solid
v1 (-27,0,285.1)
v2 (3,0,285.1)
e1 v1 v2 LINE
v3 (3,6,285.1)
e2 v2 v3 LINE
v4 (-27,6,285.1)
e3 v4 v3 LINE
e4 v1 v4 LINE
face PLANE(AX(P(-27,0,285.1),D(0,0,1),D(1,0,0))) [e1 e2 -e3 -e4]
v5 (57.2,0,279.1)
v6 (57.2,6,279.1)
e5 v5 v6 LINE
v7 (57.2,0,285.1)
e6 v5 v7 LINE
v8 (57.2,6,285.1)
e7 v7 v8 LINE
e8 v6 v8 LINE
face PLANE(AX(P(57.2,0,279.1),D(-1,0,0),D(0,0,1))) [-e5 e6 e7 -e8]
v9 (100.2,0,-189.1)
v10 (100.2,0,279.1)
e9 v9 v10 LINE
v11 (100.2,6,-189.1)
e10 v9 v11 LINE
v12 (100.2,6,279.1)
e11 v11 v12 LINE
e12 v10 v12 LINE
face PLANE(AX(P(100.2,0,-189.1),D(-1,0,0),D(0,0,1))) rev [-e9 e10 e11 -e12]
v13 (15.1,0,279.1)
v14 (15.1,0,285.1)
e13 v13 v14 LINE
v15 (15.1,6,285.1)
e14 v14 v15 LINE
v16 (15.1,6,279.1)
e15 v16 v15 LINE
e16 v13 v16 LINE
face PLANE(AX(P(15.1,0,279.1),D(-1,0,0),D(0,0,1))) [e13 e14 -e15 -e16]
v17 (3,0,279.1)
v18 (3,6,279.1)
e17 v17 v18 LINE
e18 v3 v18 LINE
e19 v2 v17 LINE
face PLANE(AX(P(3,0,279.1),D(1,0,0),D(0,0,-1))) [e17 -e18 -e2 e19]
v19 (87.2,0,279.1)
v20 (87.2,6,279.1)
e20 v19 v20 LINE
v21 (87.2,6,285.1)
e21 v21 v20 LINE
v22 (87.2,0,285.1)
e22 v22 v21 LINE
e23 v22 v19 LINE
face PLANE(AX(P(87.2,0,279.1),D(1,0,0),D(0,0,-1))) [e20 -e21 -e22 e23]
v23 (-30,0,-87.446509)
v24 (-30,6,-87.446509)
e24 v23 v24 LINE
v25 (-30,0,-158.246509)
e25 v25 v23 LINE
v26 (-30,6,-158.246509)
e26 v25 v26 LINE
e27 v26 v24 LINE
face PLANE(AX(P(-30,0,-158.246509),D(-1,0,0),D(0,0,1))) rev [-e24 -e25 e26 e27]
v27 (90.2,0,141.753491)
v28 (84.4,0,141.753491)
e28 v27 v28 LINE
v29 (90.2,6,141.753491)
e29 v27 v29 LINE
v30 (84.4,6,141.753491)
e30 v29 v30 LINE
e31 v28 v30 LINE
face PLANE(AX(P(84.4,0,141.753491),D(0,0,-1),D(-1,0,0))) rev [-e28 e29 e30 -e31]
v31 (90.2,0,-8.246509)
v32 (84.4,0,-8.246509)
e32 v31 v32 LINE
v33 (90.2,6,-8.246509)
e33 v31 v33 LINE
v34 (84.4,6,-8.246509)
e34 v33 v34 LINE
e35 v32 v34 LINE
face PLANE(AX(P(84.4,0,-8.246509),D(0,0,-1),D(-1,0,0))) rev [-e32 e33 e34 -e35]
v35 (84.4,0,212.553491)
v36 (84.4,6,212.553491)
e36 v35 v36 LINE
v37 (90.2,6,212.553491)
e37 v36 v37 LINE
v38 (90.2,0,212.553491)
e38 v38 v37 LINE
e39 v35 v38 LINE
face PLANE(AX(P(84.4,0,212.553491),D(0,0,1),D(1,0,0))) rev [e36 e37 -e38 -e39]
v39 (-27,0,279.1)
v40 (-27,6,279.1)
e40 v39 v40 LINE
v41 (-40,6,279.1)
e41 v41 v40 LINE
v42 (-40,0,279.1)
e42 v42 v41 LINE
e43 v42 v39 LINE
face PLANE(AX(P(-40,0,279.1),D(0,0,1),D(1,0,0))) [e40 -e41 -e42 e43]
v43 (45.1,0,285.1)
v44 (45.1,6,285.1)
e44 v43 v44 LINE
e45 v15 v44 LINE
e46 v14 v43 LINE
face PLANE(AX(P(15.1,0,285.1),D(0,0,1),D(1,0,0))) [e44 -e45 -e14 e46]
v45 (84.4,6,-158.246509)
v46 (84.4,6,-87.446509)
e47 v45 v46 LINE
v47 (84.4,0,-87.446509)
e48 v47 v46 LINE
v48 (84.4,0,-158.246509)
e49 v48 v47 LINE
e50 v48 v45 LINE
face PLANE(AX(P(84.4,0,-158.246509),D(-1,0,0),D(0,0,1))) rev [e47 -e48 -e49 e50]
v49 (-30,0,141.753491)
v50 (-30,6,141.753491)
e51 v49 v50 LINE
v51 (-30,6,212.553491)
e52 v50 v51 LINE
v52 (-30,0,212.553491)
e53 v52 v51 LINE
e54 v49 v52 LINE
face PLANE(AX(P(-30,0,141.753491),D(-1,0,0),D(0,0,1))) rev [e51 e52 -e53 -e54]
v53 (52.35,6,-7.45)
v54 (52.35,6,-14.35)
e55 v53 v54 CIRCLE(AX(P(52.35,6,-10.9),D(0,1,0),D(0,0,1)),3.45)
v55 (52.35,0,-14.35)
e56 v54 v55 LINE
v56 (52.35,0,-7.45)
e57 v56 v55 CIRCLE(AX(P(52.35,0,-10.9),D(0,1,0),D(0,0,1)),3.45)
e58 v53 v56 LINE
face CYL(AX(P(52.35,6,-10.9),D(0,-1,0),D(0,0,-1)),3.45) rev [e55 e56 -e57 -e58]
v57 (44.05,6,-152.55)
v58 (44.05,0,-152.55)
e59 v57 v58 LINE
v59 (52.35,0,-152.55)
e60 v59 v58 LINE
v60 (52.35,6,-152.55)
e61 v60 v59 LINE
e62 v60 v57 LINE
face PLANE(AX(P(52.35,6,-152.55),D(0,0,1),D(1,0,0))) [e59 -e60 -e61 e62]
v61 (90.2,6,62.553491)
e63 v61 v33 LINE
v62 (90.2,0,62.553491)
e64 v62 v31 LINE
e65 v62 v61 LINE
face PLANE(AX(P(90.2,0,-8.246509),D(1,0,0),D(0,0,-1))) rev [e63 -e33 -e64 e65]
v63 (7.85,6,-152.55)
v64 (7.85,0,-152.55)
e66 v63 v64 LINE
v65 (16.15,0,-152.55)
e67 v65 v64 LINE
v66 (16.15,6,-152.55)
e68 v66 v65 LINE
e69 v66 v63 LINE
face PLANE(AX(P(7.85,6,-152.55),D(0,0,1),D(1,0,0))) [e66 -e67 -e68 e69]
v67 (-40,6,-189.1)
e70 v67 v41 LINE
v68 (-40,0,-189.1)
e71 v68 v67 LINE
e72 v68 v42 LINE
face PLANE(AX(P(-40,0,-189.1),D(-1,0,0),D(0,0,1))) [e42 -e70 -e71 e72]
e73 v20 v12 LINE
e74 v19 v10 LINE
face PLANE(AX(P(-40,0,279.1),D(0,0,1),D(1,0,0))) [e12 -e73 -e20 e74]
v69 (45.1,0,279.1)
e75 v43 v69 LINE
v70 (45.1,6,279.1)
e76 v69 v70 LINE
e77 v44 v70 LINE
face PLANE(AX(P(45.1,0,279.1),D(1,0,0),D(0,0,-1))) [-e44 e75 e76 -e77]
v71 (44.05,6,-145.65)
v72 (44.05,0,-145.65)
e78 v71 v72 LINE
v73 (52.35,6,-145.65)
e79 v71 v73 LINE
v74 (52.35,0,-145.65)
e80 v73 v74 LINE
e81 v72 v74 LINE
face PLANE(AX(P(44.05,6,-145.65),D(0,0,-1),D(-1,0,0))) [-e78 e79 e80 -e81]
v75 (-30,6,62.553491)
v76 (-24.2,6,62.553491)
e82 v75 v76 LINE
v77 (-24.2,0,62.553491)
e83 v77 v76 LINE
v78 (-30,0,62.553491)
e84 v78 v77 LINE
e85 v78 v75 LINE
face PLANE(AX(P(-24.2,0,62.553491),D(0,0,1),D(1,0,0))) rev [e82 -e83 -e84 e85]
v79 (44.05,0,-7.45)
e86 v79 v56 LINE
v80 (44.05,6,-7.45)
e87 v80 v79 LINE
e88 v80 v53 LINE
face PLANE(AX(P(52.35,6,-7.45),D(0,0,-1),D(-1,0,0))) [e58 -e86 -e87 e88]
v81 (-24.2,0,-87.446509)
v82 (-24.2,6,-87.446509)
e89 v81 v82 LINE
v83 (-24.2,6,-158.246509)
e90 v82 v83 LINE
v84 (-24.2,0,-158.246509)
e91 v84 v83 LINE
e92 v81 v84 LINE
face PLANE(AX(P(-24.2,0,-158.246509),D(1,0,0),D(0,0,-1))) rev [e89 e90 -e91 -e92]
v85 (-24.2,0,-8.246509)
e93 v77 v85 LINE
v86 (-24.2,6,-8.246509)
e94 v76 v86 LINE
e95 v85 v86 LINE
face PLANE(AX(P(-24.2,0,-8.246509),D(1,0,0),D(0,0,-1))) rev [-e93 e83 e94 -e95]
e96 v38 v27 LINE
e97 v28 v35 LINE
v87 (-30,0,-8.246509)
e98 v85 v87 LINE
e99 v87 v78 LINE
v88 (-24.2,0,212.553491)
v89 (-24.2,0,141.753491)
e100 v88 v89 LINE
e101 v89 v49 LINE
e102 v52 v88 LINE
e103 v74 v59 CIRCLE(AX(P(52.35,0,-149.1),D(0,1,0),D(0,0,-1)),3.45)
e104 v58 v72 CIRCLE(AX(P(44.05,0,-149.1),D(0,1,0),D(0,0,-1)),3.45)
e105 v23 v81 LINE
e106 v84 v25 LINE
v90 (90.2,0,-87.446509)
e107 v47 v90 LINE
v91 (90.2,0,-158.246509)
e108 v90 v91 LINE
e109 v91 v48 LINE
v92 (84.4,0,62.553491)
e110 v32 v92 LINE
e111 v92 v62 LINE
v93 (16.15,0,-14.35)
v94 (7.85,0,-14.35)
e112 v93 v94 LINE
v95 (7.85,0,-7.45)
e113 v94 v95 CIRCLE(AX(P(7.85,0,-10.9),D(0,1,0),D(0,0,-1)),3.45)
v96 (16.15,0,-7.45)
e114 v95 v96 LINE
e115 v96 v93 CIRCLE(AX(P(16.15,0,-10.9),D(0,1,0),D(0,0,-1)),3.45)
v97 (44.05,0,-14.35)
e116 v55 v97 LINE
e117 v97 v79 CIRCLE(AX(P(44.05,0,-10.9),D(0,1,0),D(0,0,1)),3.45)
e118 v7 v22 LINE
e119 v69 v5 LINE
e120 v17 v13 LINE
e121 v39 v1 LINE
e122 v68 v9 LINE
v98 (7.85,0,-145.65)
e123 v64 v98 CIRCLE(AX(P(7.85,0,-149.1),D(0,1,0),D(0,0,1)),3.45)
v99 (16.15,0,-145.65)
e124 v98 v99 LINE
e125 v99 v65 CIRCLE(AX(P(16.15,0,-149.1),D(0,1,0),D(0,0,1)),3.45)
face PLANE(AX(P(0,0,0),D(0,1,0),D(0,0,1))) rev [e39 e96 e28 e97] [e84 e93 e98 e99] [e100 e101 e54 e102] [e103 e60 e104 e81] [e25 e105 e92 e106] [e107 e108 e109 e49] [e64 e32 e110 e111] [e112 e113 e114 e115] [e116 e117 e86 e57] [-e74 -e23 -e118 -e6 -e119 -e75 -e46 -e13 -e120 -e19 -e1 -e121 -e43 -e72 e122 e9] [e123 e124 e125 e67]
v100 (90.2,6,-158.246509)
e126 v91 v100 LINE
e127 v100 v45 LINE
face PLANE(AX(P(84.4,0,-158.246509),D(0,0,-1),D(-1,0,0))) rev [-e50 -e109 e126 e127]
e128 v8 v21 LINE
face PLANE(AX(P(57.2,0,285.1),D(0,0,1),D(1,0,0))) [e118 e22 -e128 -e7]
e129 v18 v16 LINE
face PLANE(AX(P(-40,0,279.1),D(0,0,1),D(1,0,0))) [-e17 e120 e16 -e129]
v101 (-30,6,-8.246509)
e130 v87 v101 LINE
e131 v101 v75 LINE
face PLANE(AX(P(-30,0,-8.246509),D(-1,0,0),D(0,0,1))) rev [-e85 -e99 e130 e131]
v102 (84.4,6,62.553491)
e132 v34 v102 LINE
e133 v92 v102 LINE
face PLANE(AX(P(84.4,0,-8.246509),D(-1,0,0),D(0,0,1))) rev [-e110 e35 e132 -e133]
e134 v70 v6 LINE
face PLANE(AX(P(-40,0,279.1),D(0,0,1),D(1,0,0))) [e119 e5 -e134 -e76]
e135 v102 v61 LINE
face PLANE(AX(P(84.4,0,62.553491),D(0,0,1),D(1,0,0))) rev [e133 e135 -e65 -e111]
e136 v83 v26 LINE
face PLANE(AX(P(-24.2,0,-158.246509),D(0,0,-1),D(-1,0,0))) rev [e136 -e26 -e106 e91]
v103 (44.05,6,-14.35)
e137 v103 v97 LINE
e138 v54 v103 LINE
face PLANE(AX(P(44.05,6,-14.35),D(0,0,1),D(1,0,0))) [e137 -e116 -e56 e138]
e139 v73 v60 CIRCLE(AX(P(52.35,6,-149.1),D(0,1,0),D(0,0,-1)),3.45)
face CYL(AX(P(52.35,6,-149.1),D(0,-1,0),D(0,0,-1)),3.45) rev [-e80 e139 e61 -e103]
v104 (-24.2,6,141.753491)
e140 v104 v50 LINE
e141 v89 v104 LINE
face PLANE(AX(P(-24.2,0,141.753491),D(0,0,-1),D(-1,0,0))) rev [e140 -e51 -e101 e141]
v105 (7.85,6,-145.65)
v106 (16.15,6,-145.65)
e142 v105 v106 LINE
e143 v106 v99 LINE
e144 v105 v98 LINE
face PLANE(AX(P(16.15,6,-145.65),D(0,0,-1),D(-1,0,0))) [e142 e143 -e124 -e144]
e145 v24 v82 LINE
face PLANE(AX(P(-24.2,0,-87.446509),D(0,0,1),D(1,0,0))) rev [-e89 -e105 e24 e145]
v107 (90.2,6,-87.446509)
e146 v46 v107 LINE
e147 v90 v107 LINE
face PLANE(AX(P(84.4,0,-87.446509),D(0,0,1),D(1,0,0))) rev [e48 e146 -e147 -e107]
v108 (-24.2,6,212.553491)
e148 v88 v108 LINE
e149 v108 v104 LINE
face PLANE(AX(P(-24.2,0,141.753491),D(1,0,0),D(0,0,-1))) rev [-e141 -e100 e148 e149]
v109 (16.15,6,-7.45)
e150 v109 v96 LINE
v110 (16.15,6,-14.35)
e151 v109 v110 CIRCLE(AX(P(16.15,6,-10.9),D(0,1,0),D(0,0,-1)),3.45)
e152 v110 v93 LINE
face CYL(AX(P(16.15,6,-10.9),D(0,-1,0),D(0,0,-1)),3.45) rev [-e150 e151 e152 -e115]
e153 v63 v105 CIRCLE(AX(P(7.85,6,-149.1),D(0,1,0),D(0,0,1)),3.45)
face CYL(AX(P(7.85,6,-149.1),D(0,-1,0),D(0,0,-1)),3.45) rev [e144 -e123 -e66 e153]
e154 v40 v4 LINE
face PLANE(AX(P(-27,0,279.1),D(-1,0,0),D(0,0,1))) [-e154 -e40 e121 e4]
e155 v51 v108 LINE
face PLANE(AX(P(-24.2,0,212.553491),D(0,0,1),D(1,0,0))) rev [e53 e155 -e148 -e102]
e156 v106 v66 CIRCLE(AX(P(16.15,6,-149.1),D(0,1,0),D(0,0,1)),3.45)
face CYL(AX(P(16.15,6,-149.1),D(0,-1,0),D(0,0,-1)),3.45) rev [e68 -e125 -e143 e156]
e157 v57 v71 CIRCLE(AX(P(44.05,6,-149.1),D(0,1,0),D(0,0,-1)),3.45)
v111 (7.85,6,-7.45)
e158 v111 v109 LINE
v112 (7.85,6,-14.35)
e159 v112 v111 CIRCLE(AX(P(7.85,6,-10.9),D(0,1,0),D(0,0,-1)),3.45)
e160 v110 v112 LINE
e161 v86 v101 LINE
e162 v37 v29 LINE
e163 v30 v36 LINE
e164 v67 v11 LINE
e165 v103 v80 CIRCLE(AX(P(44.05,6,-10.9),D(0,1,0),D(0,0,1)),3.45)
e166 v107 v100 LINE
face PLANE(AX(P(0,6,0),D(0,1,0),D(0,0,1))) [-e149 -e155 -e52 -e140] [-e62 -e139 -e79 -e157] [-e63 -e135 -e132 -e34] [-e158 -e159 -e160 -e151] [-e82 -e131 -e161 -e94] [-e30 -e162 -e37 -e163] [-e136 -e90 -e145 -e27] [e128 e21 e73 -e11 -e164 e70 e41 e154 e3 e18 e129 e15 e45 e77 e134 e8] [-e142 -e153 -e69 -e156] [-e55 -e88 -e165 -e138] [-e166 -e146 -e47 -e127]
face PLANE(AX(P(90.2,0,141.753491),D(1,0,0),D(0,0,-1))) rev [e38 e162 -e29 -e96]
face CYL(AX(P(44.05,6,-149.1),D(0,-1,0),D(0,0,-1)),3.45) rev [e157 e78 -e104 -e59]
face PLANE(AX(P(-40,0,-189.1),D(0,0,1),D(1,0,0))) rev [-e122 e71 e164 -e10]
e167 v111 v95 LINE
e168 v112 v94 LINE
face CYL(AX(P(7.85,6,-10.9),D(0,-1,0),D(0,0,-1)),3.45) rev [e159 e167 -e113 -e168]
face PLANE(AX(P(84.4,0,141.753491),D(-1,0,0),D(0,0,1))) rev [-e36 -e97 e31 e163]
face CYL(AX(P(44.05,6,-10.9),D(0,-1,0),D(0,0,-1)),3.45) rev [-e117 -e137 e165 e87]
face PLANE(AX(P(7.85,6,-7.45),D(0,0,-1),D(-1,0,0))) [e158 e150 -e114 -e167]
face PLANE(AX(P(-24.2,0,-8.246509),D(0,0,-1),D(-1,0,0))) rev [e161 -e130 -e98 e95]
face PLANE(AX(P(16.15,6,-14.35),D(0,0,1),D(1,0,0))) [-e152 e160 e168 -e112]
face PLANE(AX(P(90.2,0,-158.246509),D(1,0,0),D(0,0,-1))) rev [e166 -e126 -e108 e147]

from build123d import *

# Parameters (mm, degrees)
SKETCH1_W           = 60.2
SKETCH1_H           = 160
BOSS_EXTRUDE1_DEPTH = 6
BOSS_EXTRUDE2_START = -6
SKETCH2_W           = 140.2
SKETCH2_H           = 468.2
BOSS_EXTRUDE2_DEPTH = 6
SKETCH3_W           = 5.8
SKETCH3_H           = 70.8
CUT_EXTRUDE1_DEPTH  = 6
SKETCH4_W           = 30
SKETCH4_H           = 6
BOSS_EXTRUDE3_DEPTH = 6


with BuildPart() as part:
    # Sketch1 → Boss-Extrude1 (new body)
    with BuildSketch(Plane(origin=(0, 0, 0), x_dir=(1, 0, 0), z_dir=(0, 1, 0))):
        with Locations((30.1, 80)):
            Rectangle(SKETCH1_W, SKETCH1_H)
        with BuildLine():
            Line((7.85, 152.55), (16.15, 152.55))
            ThreePointArc((16.15, 152.55), (19.6, 149.1), (16.15, 145.65))
            Line((16.15, 145.65), (7.85, 145.65))
            ThreePointArc((7.85, 145.65), (4.4, 149.1), (7.85, 152.55))
        make_face(mode=Mode.SUBTRACT)
        with BuildLine():
            Line((44.05, 145.65), (52.35, 145.65))
            ThreePointArc((52.35, 145.65), (55.8, 149.1), (52.35, 152.55))
            Line((52.35, 152.55), (44.05, 152.55))
            ThreePointArc((44.05, 152.55), (40.6, 149.1), (44.05, 145.65))
        make_face(mode=Mode.SUBTRACT)
        with BuildLine():
            Line((52.35, 7.45), (44.05, 7.45))
            ThreePointArc((44.05, 7.45), (40.6, 10.9), (44.05, 14.35))
            Line((44.05, 14.35), (52.35, 14.35))
            ThreePointArc((52.35, 14.35), (55.8, 10.9), (52.35, 7.45))
        make_face(mode=Mode.SUBTRACT)
        with BuildLine():
            Line((16.15, 14.35), (7.85, 14.35))
            ThreePointArc((7.85, 14.35), (4.4, 10.9), (7.85, 7.45))
            Line((7.85, 7.45), (16.15, 7.45))
            ThreePointArc((16.15, 7.45), (19.6, 10.9), (16.15, 14.35))
        make_face(mode=Mode.SUBTRACT)
    extrude(amount=BOSS_EXTRUDE1_DEPTH)

    # Sketch2 → Boss-Extrude2 (add)
    with BuildSketch(Plane(origin=(0, 6, 0), x_dir=(1, 0, 0), z_dir=(0, 1, 0)).offset(BOSS_EXTRUDE2_START)):
        with Locations((30.1, -45)):
            Rectangle(SKETCH2_W, SKETCH2_H)
        with BuildLine():
            Line((16.15, 7.45), (7.85, 7.45))
            ThreePointArc((7.85, 7.45), (4.4, 10.9), (7.85, 14.35))
            Line((7.85, 14.35), (16.15, 14.35))
            ThreePointArc((16.15, 14.35), (19.6, 10.9), (16.15, 7.45))
        make_face(mode=Mode.SUBTRACT)
        with BuildLine():
            Line((16.15, 145.65), (7.85, 145.65))
            ThreePointArc((7.85, 145.65), (4.4, 149.1), (7.85, 152.55))
            Line((7.85, 152.55), (16.15, 152.55))
            ThreePointArc((16.15, 152.55), (19.6, 149.1), (16.15, 145.65))
        make_face(mode=Mode.SUBTRACT)
        with BuildLine():
            Line((52.35, 7.45), (44.05, 7.45))
            ThreePointArc((44.05, 7.45), (40.6, 10.9), (44.05, 14.35))
            Line((44.05, 14.35), (52.35, 14.35))
            ThreePointArc((52.35, 14.35), (55.8, 10.9), (52.35, 7.45))
        make_face(mode=Mode.SUBTRACT)
        with BuildLine():
            Line((52.35, 145.65), (44.05, 145.65))
            ThreePointArc((44.05, 145.65), (40.6, 149.1), (44.05, 152.55))
            Line((44.05, 152.55), (52.35, 152.55))
            ThreePointArc((52.35, 152.55), (55.8, 149.1), (52.35, 145.65))
        make_face(mode=Mode.SUBTRACT)
    extrude(amount=BOSS_EXTRUDE2_DEPTH)

    # Sketch3 → Cut-Extrude1 (cut)
    with BuildSketch(Plane(origin=(0, 6, 0), x_dir=(1, 0, 0), z_dir=(0, 1, 0))):
        with Locations((87.3, 122.8465093)):
            Rectangle(SKETCH3_W, SKETCH3_H)
        with Locations((-27.1, 122.8465093)):
            Rectangle(SKETCH3_W, SKETCH3_H)
        with Locations((-27.1, -27.1534907)):
            Rectangle(SKETCH3_W, SKETCH3_H)
        with Locations((87.3, -27.1534907)):
            Rectangle(SKETCH3_W, SKETCH3_H)
        with Locations((-27.1, -177.1534907)):
            Rectangle(SKETCH3_W, SKETCH3_H)
        with Locations((87.3, -177.1534907)):
            Rectangle(SKETCH3_W, SKETCH3_H)
    extrude(amount=-CUT_EXTRUDE1_DEPTH, mode=Mode.SUBTRACT)

    # Sketch4 → Boss-Extrude3 (add)
    with BuildSketch(Plane(origin=(0, 6, 0), x_dir=(1, 0, 0), z_dir=(0, 1, 0))):
        with Locations((-12, -282.1)):
            Rectangle(SKETCH4_W, SKETCH4_H)
        with Locations((30.1, -282.1)):
            Rectangle(SKETCH4_W, SKETCH4_H)
        with Locations((72.2, -282.1)):
            Rectangle(SKETCH4_W, SKETCH4_H)
    extrude(amount=-BOSS_EXTRUDE3_DEPTH)


solid = part.part
